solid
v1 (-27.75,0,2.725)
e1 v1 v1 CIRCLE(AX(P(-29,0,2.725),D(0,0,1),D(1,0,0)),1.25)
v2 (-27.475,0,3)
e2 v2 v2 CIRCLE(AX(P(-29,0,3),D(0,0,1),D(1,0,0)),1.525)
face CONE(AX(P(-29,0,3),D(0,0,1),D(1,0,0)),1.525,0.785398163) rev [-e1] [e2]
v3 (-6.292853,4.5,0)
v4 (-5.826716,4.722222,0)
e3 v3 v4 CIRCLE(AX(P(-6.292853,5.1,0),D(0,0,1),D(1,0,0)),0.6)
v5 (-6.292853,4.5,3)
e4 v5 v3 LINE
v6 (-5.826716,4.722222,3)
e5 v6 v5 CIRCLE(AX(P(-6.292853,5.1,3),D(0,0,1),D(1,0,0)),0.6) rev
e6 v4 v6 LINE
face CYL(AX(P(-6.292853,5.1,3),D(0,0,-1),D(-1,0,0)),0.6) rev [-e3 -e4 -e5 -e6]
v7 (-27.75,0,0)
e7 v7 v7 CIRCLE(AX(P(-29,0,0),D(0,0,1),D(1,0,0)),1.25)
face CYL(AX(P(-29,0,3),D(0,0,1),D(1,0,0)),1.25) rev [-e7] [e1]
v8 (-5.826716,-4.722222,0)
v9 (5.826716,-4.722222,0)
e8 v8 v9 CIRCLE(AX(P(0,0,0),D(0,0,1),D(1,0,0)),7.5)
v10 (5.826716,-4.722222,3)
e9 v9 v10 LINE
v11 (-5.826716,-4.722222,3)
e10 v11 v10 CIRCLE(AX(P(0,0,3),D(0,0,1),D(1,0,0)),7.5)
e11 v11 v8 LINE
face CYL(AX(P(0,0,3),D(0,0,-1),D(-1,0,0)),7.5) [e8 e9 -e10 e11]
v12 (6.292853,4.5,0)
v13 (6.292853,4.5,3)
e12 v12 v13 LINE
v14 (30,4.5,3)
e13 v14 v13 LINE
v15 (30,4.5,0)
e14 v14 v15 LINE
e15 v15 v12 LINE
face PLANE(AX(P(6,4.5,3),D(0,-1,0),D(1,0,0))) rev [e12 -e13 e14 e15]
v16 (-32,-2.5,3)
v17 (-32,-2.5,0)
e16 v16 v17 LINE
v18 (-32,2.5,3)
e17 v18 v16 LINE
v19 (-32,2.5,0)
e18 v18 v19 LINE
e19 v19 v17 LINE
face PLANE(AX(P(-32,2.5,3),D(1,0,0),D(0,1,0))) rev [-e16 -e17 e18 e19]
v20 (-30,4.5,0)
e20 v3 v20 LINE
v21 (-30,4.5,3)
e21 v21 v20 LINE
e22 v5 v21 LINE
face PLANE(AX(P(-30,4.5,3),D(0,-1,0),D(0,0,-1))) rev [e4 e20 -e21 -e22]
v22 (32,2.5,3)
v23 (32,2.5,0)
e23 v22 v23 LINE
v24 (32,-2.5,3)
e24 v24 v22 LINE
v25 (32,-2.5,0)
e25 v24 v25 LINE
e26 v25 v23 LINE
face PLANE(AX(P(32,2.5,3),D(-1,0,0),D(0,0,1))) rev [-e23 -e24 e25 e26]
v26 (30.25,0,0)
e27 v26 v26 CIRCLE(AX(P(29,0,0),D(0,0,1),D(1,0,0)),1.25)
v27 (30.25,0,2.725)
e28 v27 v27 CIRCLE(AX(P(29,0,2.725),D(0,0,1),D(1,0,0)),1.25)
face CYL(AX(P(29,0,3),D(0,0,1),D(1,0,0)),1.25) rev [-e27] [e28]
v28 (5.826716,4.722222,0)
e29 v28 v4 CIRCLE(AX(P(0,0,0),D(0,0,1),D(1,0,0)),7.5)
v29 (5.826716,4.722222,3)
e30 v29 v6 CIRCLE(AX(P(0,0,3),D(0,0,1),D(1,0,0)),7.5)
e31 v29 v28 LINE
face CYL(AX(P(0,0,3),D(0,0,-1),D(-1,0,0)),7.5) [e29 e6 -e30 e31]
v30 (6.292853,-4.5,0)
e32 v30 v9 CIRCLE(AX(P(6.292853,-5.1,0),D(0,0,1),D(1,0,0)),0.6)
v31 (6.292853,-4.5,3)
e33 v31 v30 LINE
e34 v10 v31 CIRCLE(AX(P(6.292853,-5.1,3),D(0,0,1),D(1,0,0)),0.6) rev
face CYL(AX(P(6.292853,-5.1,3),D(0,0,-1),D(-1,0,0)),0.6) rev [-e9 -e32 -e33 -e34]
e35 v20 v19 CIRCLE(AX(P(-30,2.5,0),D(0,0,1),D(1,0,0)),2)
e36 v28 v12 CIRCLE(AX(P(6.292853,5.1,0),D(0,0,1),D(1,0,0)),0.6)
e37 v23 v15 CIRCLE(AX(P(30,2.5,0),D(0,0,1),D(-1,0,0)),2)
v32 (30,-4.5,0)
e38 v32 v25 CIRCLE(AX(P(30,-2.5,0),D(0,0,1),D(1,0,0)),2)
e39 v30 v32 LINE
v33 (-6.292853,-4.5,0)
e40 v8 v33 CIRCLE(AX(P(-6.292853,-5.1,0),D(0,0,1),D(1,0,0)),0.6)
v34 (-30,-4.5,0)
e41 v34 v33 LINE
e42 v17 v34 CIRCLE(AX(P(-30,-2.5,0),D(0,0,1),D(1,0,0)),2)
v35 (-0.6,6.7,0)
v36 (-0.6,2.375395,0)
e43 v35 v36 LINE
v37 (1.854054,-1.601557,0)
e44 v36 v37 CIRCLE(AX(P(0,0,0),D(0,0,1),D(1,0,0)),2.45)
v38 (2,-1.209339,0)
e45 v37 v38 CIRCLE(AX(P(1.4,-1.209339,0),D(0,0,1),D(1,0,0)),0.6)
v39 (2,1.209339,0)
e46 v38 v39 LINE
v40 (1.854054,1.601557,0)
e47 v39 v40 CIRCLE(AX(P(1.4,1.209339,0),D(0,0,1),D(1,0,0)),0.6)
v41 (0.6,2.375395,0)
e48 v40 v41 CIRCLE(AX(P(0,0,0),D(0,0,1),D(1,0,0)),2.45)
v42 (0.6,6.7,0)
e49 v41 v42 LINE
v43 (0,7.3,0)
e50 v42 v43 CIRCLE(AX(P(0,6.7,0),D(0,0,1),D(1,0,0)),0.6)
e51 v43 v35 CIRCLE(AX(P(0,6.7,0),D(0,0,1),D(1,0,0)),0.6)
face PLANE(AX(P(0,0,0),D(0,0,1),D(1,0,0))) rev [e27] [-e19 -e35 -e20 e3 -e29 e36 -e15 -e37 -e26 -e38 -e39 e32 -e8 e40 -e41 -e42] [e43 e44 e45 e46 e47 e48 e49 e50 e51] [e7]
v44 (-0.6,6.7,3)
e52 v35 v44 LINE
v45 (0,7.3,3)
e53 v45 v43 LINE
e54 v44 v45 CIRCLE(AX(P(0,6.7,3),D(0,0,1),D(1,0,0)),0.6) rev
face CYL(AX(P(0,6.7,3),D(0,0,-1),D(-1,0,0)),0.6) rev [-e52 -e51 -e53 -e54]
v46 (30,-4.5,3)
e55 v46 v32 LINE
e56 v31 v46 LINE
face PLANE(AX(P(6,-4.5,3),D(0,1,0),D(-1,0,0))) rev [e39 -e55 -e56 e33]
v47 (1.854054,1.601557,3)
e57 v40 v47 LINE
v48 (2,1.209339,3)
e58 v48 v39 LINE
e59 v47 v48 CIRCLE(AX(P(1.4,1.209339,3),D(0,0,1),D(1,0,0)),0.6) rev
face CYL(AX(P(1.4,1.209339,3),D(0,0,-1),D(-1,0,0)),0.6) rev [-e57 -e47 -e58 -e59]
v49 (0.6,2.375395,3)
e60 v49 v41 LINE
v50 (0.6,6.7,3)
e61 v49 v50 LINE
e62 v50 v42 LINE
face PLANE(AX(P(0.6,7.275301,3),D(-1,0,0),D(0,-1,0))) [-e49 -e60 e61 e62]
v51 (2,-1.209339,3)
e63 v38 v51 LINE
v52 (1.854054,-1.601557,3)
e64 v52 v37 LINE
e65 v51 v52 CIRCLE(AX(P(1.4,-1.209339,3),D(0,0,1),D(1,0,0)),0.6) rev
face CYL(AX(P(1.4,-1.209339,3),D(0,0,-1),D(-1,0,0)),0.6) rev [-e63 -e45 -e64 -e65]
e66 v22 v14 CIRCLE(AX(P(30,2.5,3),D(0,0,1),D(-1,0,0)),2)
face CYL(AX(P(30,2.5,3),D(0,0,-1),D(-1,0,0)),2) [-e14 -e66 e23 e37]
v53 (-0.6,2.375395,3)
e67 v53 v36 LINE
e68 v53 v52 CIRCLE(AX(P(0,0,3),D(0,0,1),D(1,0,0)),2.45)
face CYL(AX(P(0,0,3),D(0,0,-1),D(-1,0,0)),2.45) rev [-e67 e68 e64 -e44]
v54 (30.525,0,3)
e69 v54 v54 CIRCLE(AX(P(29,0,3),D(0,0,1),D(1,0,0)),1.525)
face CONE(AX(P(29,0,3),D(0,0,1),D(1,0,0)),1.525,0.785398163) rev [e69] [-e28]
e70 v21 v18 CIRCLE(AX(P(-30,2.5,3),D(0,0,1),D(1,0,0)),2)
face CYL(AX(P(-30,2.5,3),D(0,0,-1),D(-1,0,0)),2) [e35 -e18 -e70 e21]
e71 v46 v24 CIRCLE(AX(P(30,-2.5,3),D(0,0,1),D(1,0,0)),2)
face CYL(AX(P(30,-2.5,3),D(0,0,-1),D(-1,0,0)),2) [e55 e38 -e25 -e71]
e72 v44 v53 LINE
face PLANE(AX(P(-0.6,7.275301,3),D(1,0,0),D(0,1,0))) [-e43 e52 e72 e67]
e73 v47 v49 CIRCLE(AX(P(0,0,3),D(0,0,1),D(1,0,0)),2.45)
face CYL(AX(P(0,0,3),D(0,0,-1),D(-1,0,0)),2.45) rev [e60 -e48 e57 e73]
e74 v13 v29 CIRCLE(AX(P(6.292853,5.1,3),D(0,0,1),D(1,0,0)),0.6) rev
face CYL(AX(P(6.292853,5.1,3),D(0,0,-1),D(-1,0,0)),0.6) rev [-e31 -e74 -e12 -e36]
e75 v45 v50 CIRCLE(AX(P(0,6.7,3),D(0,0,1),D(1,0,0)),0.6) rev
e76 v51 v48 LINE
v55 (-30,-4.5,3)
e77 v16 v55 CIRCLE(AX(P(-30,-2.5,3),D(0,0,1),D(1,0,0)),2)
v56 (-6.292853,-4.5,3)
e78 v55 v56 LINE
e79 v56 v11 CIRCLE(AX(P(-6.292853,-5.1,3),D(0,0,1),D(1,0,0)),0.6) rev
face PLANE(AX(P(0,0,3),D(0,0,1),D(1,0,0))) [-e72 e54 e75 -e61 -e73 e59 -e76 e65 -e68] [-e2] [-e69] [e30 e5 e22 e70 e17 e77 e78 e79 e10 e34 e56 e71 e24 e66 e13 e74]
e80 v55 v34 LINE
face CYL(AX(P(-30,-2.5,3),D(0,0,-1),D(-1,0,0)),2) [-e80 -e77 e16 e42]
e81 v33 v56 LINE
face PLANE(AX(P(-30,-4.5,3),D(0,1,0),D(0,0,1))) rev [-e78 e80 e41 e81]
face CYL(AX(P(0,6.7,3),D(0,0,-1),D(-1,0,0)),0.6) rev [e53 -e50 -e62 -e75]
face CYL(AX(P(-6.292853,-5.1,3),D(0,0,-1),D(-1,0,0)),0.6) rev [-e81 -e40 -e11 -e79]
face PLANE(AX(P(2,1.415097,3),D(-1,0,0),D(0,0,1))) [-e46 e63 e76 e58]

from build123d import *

# Parameters (mm, degrees)
EXTRUDE_1_DEPTH      = 3
M3X0_5_1_D           = 2.5
M3X0_5_1_CSINK_D     = 3.05
M3X0_5_1_CSINK_ANGLE = 90
FILLET_1_R           = 0.6


with BuildPart() as part:
    # 草图1 → 凸台-拉伸1 (new body)
    with BuildSketch(Plane.XY):
        with BuildLine():
            Line((6, 4.5), (30, 4.5))
            ThreePointArc((30, 4.5), (31.414213562, 3.914213562), (32, 2.5))
            Line((32, 2.5), (32, -2.5))
            ThreePointArc((32, -2.5), (31.414213562, -3.914213562), (30, -4.5))
            Line((30, -4.5), (6, -4.5))
            ThreePointArc((6, -4.5), (0, -7.5), (-6, -4.5))
            Line((-6, -4.5), (-30, -4.5))
            ThreePointArc((-30, -4.5), (-31.414213562, -3.914213562), (-32, -2.5))
            Line((-32, -2.5), (-32, 2.5))
            ThreePointArc((-32, 2.5), (-31.414213562, 3.914213562), (-30, 4.5))
            Line((-30, 4.5), (-6, 4.5))
            ThreePointArc((-6, 4.5), (-3.045393494, 6.853873246), (0.681818182, 7.468943966))
            ThreePointArc((0.681818182, 7.468943966), (3.6558625, 6.548638742), (6, 4.5))
        make_face()
        with BuildLine():
            Line((0.6, 7.275300681), (0.6, 2.375394704))
            ThreePointArc((0.6, 2.375394704), (1.385836512, 2.020385399), (2, 1.41509717))
            Line((2, 1.41509717), (2, -1.41509717))
            ThreePointArc((2, -1.41509717), (-2.020385399, -1.385836512), (-0.6, 2.375394704))
            Line((-0.6, 2.375394704), (-0.6, 7.275300681))
            ThreePointArc((-0.6, 7.275300681), (0, 7.3), (0.6, 7.275300681))
        make_face(mode=Mode.SUBTRACT)
    extrude(amount=EXTRUDE_1_DEPTH)

    # M3x0.5 螺纹孔1 (through all)
    with Locations(Plane.XY.offset(3)):
        with Locations((-29, 0), (29, 0)):
            CounterSinkHole(M3X0_5_1_D / 2, M3X0_5_1_CSINK_D / 2, counter_sink_angle=M3X0_5_1_CSINK_ANGLE)

    # 圆角1
    fillet_1_edges = [part.edges().sort_by_distance(p)[0] for p in [
        (0.6, 7.275300681, 1.5),
        (-0.6, 7.275300681, 1.5),
        (2, -1.41509717, 1.5),
        (2, 1.41509717, 1.5),
        (-6, -4.5, 1.5),
        (6, -4.5, 1.5),
        (6, 4.5, 1.5),
        (-6, 4.5, 1.5),
    ]]
    fillet(fillet_1_edges, radius=FILLET_1_R - 0.0001)  # a hair under: the kernel refuses the full size


solid = part.part
